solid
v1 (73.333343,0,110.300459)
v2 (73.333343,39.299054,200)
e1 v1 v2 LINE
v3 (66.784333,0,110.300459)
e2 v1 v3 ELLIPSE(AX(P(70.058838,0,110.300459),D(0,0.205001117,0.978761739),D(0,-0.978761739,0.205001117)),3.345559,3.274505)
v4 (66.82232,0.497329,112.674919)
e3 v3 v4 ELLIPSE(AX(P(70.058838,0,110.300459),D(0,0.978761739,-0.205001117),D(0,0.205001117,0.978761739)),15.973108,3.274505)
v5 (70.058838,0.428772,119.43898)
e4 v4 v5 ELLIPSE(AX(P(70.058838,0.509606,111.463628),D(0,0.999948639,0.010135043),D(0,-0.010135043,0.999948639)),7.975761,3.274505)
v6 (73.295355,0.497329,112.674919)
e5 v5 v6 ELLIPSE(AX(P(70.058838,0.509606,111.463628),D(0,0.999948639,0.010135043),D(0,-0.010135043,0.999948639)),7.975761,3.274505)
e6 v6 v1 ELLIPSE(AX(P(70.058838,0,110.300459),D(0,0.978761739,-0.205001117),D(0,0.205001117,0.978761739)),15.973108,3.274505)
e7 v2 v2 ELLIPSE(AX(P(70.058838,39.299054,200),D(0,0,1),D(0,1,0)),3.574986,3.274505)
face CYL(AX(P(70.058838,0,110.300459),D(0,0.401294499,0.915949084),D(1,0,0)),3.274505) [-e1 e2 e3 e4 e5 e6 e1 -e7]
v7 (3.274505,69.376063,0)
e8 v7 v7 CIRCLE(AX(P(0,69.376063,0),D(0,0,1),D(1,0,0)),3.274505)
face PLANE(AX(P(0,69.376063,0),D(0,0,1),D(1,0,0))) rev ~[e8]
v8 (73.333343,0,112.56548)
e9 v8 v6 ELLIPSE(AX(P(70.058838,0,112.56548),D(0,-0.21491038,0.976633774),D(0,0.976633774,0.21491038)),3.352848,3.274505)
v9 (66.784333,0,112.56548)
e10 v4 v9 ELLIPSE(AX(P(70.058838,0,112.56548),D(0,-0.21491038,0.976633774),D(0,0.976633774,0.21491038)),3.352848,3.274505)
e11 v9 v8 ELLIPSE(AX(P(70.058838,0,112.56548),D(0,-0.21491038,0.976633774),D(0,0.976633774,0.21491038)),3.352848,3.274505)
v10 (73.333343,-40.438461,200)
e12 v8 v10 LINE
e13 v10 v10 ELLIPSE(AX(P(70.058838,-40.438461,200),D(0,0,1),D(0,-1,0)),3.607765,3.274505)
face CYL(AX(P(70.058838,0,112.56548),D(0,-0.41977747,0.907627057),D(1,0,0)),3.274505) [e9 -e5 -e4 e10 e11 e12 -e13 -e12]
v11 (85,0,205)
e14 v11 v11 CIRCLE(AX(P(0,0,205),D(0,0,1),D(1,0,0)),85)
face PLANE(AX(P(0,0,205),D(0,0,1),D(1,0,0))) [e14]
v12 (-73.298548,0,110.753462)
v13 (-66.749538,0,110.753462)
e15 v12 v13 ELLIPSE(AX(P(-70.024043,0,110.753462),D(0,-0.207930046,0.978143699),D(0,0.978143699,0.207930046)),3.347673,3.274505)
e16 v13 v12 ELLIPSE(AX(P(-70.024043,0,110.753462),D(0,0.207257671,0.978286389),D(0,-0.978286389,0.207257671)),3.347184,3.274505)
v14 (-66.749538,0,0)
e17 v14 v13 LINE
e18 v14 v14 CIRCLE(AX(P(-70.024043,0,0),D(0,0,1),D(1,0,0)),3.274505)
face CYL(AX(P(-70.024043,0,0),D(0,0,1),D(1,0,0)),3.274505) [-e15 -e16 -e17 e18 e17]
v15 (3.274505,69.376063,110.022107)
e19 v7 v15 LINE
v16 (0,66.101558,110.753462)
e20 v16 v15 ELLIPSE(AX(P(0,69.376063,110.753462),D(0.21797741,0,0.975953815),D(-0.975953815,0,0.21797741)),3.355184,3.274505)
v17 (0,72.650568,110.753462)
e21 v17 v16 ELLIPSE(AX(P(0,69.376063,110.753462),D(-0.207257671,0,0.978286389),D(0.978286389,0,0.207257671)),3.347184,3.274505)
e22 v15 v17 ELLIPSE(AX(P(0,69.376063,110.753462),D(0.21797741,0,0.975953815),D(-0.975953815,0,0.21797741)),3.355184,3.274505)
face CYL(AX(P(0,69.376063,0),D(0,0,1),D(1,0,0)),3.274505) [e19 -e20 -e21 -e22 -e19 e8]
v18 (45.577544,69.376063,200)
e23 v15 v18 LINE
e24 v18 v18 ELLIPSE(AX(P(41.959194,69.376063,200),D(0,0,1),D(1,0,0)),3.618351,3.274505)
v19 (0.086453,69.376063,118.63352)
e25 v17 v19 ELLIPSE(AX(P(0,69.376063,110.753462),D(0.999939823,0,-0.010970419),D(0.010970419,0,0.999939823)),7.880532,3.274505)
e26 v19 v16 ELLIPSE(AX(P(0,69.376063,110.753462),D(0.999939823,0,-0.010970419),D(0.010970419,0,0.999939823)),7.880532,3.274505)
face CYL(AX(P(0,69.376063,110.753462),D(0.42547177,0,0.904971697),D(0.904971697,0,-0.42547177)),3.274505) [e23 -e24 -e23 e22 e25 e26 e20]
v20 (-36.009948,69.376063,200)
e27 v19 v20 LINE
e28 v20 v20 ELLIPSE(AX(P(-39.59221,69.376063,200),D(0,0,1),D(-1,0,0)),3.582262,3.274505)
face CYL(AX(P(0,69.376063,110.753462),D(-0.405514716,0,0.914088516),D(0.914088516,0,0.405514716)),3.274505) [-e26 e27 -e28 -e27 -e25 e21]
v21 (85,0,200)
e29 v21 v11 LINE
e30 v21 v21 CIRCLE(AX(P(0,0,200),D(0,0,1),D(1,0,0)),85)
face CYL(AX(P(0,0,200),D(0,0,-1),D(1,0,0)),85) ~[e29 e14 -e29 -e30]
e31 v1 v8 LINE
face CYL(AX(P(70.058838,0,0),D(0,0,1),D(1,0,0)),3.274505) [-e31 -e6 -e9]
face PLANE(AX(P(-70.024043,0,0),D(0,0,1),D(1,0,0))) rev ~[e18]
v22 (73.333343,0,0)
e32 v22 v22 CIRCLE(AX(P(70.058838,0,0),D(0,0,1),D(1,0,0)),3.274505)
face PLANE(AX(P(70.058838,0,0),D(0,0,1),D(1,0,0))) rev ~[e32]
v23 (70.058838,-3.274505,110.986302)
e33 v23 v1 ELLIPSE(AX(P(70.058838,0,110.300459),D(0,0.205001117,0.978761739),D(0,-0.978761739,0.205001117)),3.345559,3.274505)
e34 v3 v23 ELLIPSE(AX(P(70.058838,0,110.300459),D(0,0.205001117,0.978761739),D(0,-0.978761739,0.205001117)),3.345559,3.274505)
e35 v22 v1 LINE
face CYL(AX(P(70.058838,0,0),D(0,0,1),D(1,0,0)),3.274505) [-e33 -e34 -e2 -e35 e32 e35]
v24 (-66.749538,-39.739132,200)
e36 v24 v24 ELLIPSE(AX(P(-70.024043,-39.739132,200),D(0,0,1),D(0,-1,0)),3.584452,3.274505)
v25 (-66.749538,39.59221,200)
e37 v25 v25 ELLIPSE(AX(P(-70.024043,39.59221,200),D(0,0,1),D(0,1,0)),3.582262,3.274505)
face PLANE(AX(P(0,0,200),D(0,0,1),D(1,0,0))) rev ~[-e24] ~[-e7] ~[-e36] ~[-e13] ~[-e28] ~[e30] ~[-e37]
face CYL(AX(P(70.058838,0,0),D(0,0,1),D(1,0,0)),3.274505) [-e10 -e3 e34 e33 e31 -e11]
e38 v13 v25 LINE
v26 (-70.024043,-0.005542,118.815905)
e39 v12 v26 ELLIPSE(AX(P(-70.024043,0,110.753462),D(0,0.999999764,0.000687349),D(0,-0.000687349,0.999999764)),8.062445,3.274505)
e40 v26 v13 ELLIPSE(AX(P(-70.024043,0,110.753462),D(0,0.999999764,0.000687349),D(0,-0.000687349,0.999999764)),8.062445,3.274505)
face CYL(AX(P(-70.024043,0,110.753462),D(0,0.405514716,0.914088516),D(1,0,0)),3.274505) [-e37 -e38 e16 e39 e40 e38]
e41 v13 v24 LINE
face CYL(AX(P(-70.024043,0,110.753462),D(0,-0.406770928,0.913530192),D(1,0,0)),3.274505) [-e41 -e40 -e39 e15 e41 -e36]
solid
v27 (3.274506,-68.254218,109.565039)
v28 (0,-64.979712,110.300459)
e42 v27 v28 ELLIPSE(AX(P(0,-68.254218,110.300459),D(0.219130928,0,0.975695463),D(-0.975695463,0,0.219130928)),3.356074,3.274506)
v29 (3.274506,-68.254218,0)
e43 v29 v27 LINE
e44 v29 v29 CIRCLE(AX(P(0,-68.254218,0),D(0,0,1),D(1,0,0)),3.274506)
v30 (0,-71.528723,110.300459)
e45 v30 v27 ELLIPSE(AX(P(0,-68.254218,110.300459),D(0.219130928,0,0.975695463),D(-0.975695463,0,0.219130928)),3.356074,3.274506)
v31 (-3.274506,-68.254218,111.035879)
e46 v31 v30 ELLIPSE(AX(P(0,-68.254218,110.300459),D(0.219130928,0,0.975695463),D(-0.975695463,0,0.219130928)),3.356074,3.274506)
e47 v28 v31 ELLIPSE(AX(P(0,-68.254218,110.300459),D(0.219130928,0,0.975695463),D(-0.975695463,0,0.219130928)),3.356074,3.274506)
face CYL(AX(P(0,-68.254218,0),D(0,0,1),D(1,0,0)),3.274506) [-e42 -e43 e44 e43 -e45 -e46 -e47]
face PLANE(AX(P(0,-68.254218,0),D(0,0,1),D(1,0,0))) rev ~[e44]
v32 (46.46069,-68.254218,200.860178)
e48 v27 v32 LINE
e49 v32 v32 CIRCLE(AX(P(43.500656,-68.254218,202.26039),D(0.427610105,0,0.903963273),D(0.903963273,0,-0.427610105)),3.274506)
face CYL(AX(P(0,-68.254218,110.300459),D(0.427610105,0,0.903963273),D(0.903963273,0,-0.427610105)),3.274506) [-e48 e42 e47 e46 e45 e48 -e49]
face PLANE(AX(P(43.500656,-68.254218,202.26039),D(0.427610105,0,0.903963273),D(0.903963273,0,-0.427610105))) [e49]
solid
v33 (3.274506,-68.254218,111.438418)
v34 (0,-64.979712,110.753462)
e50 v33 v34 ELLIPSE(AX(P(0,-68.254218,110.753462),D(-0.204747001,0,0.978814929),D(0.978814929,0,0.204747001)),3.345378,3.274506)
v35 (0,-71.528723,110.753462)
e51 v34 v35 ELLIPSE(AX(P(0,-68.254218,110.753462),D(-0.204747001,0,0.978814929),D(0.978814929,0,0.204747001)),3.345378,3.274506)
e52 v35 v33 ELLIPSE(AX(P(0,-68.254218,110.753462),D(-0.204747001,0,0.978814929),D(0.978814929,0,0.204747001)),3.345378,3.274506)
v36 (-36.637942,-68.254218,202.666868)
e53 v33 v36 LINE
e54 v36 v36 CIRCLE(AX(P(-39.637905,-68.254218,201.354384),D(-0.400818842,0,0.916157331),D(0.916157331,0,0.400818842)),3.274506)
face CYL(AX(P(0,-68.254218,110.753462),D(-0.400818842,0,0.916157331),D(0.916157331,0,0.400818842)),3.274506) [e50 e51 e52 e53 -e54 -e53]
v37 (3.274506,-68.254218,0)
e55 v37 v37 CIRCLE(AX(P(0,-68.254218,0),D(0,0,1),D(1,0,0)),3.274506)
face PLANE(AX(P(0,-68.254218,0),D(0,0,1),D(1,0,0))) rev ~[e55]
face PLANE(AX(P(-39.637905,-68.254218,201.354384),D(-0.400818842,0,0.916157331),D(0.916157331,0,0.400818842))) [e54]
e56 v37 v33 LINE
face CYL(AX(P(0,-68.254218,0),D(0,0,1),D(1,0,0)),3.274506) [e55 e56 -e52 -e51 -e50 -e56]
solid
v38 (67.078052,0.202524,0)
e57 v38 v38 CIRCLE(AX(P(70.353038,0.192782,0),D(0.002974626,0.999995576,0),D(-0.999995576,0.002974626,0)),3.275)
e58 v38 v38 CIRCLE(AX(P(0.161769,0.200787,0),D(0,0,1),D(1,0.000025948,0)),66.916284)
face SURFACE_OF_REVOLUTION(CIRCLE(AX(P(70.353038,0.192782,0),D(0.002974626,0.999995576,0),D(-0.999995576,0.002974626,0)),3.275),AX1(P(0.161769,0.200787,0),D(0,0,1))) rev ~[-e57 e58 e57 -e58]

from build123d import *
from build123d import SkipClean  # not in build123d's __all__

# Parameters (mm, degrees)
F1_R     = 85
F2_DEPTH = 5
F3_R     = 3.2745059597
F17_R    = 3.274505
F16_R    = 3.274505
F15_R    = 3.274505
F27_R    = 3.275


with BuildPart() as f2:
    # F1 (on offset) → F2 (new body)
    with BuildSketch(Plane.XY.offset(200)):
        Circle(F1_R)
    extrude(amount=F2_DEPTH)

    # F18: sweep along a path in F11
    with BuildLine(Plane.YZ.offset(-70)) as f18_path:
        Line((0, 0), (0, 110.7534617186))
        Line((0, 110.7534617186), (40.7959488519, 202.7134001255))
    # F17 (on Top) → F18 (sweep)
    with BuildSketch(Plane.XY):
        with Locations((-70.0240433216, 0)):
            Circle(F17_R)
    sweep(path=f18_path.line, transition=Transition.RIGHT)

    # F20: sweep along a path in F19
    with BuildLine(Plane.YZ.offset(-70)) as f20_path:
        Line((0, 0), (0, 110.7534617186))
        Line((0, 110.7534617186), (-40.5439175665, 201.8073946238))
    # F17 (on Top) → F20 (sweep)
    with BuildSketch(Plane.XY):
        with Locations((-70.0240433216, 0)):
            Circle(F17_R)
    sweep(path=f20_path.line, transition=Transition.RIGHT)

    # F21: sweep along a path in F9
    with BuildLine(Plane.YZ.offset(70)) as f21_path:
        Line((0, 0), (0, 110.3004589677))
        Line((0, 110.3004589677), (40.0909073651, 201.8073946238))
    # F16 (on Top) → F21 (sweep)
    with BuildSketch(Plane.XY):
        with Locations((70.058837533, 0)):
            Circle(F16_R)
    sweep(path=f21_path.line, transition=Transition.RIGHT)

    # F23: sweep along a path in F22
    with BuildLine(Plane.YZ.offset(70)) as f23_path:
        Line((0, 0), (0, 112.5654801726))
        Line((0, 112.5654801726), (-41.9029258192, 203.166410327))
    # F16 (on Top) → F23 (sweep)
    with BuildSketch(Plane.XY):
        with Locations((70.058837533, 0)):
            Circle(F16_R)
    with SkipClean():  # cleaning this boolean's faces spoils the solid; the shape is the same uncleaned
        sweep(path=f23_path.line, transition=Transition.RIGHT)

    # F25: sweep along a path in F10
    with BuildLine(Plane.XZ.offset(-70)) as f25_path:
        Line((0, 0), (0, 110.7534617186))
        Line((0, 110.7534617186), (42.8089387715, 201.8073946238))
    # F15 (on Top) → F25 (sweep)
    with BuildSketch(Plane.XY):
        with Locations((0, 69.3760632882)):
            Circle(F15_R)
    with SkipClean():  # cleaning this boolean's faces spoils the solid; the shape is the same uncleaned
        sweep(path=f25_path.line, transition=Transition.RIGHT)

    # F26: sweep along a path in F24
    with BuildLine(Plane.XZ.offset(-70)) as f26_path:
        Line((0, 0), (0, 110.7534617186))
        Line((0, 110.7534617186), (-40.9969165921, 203.166410327))
    # F15 (on Top) → F26 (sweep)
    with BuildSketch(Plane.XY):
        with Locations((0, 69.3760632882)):
            Circle(F15_R)
    with SkipClean():  # cleaning this boolean's faces spoils the solid; the shape is the same uncleaned
        sweep(path=f26_path.line, transition=Transition.RIGHT)


with BuildPart() as f12:
    # F12: sweep along a path in F5
    with BuildLine(Plane.XZ.offset(70)) as f12_path:
        Line((0, 0), (0, 110.3004589677))
        Line((0, 110.3004589677), (43.5006563944, 202.260389924))
    # F3 (on Top) → F12 (sweep)
    with BuildSketch(Plane.XY):
        with Locations((0, -68.2542175055)):
            Circle(F3_R)
    sweep(path=f12_path.line, transition=Transition.RIGHT)


with BuildPart() as f14:
    # F14: sweep along a path in F13
    with BuildLine(Plane.XZ.offset(70)) as f14_path:
        Line((0, 0), (0, 110.7534617186))
        Line((0, 110.7534617186), (-39.6379046142, 201.3543844223))
    # F3 (on Top) → F14 (sweep)
    with BuildSketch(Plane.XY):
        with Locations((0, -68.2542175055)):
            Circle(F3_R)
    sweep(path=f14_path.line, transition=Transition.RIGHT)


with BuildPart() as f29:
    # F29: sweep along a path in F28
    with BuildLine(Plane.XY) as f29_path:
        CenterArc((0.1617685287, 0.2007872436), 67.5, 0, 360)
    # F27 (on Front) → F29 (sweep)
    with BuildSketch(Plane.XZ):
        with Locations((-70.0292140245, 0)):
            Circle(F27_R)
    sweep(path=f29_path.line)


solid = Compound([f2.part, f12.part, f14.part, f29.part])
